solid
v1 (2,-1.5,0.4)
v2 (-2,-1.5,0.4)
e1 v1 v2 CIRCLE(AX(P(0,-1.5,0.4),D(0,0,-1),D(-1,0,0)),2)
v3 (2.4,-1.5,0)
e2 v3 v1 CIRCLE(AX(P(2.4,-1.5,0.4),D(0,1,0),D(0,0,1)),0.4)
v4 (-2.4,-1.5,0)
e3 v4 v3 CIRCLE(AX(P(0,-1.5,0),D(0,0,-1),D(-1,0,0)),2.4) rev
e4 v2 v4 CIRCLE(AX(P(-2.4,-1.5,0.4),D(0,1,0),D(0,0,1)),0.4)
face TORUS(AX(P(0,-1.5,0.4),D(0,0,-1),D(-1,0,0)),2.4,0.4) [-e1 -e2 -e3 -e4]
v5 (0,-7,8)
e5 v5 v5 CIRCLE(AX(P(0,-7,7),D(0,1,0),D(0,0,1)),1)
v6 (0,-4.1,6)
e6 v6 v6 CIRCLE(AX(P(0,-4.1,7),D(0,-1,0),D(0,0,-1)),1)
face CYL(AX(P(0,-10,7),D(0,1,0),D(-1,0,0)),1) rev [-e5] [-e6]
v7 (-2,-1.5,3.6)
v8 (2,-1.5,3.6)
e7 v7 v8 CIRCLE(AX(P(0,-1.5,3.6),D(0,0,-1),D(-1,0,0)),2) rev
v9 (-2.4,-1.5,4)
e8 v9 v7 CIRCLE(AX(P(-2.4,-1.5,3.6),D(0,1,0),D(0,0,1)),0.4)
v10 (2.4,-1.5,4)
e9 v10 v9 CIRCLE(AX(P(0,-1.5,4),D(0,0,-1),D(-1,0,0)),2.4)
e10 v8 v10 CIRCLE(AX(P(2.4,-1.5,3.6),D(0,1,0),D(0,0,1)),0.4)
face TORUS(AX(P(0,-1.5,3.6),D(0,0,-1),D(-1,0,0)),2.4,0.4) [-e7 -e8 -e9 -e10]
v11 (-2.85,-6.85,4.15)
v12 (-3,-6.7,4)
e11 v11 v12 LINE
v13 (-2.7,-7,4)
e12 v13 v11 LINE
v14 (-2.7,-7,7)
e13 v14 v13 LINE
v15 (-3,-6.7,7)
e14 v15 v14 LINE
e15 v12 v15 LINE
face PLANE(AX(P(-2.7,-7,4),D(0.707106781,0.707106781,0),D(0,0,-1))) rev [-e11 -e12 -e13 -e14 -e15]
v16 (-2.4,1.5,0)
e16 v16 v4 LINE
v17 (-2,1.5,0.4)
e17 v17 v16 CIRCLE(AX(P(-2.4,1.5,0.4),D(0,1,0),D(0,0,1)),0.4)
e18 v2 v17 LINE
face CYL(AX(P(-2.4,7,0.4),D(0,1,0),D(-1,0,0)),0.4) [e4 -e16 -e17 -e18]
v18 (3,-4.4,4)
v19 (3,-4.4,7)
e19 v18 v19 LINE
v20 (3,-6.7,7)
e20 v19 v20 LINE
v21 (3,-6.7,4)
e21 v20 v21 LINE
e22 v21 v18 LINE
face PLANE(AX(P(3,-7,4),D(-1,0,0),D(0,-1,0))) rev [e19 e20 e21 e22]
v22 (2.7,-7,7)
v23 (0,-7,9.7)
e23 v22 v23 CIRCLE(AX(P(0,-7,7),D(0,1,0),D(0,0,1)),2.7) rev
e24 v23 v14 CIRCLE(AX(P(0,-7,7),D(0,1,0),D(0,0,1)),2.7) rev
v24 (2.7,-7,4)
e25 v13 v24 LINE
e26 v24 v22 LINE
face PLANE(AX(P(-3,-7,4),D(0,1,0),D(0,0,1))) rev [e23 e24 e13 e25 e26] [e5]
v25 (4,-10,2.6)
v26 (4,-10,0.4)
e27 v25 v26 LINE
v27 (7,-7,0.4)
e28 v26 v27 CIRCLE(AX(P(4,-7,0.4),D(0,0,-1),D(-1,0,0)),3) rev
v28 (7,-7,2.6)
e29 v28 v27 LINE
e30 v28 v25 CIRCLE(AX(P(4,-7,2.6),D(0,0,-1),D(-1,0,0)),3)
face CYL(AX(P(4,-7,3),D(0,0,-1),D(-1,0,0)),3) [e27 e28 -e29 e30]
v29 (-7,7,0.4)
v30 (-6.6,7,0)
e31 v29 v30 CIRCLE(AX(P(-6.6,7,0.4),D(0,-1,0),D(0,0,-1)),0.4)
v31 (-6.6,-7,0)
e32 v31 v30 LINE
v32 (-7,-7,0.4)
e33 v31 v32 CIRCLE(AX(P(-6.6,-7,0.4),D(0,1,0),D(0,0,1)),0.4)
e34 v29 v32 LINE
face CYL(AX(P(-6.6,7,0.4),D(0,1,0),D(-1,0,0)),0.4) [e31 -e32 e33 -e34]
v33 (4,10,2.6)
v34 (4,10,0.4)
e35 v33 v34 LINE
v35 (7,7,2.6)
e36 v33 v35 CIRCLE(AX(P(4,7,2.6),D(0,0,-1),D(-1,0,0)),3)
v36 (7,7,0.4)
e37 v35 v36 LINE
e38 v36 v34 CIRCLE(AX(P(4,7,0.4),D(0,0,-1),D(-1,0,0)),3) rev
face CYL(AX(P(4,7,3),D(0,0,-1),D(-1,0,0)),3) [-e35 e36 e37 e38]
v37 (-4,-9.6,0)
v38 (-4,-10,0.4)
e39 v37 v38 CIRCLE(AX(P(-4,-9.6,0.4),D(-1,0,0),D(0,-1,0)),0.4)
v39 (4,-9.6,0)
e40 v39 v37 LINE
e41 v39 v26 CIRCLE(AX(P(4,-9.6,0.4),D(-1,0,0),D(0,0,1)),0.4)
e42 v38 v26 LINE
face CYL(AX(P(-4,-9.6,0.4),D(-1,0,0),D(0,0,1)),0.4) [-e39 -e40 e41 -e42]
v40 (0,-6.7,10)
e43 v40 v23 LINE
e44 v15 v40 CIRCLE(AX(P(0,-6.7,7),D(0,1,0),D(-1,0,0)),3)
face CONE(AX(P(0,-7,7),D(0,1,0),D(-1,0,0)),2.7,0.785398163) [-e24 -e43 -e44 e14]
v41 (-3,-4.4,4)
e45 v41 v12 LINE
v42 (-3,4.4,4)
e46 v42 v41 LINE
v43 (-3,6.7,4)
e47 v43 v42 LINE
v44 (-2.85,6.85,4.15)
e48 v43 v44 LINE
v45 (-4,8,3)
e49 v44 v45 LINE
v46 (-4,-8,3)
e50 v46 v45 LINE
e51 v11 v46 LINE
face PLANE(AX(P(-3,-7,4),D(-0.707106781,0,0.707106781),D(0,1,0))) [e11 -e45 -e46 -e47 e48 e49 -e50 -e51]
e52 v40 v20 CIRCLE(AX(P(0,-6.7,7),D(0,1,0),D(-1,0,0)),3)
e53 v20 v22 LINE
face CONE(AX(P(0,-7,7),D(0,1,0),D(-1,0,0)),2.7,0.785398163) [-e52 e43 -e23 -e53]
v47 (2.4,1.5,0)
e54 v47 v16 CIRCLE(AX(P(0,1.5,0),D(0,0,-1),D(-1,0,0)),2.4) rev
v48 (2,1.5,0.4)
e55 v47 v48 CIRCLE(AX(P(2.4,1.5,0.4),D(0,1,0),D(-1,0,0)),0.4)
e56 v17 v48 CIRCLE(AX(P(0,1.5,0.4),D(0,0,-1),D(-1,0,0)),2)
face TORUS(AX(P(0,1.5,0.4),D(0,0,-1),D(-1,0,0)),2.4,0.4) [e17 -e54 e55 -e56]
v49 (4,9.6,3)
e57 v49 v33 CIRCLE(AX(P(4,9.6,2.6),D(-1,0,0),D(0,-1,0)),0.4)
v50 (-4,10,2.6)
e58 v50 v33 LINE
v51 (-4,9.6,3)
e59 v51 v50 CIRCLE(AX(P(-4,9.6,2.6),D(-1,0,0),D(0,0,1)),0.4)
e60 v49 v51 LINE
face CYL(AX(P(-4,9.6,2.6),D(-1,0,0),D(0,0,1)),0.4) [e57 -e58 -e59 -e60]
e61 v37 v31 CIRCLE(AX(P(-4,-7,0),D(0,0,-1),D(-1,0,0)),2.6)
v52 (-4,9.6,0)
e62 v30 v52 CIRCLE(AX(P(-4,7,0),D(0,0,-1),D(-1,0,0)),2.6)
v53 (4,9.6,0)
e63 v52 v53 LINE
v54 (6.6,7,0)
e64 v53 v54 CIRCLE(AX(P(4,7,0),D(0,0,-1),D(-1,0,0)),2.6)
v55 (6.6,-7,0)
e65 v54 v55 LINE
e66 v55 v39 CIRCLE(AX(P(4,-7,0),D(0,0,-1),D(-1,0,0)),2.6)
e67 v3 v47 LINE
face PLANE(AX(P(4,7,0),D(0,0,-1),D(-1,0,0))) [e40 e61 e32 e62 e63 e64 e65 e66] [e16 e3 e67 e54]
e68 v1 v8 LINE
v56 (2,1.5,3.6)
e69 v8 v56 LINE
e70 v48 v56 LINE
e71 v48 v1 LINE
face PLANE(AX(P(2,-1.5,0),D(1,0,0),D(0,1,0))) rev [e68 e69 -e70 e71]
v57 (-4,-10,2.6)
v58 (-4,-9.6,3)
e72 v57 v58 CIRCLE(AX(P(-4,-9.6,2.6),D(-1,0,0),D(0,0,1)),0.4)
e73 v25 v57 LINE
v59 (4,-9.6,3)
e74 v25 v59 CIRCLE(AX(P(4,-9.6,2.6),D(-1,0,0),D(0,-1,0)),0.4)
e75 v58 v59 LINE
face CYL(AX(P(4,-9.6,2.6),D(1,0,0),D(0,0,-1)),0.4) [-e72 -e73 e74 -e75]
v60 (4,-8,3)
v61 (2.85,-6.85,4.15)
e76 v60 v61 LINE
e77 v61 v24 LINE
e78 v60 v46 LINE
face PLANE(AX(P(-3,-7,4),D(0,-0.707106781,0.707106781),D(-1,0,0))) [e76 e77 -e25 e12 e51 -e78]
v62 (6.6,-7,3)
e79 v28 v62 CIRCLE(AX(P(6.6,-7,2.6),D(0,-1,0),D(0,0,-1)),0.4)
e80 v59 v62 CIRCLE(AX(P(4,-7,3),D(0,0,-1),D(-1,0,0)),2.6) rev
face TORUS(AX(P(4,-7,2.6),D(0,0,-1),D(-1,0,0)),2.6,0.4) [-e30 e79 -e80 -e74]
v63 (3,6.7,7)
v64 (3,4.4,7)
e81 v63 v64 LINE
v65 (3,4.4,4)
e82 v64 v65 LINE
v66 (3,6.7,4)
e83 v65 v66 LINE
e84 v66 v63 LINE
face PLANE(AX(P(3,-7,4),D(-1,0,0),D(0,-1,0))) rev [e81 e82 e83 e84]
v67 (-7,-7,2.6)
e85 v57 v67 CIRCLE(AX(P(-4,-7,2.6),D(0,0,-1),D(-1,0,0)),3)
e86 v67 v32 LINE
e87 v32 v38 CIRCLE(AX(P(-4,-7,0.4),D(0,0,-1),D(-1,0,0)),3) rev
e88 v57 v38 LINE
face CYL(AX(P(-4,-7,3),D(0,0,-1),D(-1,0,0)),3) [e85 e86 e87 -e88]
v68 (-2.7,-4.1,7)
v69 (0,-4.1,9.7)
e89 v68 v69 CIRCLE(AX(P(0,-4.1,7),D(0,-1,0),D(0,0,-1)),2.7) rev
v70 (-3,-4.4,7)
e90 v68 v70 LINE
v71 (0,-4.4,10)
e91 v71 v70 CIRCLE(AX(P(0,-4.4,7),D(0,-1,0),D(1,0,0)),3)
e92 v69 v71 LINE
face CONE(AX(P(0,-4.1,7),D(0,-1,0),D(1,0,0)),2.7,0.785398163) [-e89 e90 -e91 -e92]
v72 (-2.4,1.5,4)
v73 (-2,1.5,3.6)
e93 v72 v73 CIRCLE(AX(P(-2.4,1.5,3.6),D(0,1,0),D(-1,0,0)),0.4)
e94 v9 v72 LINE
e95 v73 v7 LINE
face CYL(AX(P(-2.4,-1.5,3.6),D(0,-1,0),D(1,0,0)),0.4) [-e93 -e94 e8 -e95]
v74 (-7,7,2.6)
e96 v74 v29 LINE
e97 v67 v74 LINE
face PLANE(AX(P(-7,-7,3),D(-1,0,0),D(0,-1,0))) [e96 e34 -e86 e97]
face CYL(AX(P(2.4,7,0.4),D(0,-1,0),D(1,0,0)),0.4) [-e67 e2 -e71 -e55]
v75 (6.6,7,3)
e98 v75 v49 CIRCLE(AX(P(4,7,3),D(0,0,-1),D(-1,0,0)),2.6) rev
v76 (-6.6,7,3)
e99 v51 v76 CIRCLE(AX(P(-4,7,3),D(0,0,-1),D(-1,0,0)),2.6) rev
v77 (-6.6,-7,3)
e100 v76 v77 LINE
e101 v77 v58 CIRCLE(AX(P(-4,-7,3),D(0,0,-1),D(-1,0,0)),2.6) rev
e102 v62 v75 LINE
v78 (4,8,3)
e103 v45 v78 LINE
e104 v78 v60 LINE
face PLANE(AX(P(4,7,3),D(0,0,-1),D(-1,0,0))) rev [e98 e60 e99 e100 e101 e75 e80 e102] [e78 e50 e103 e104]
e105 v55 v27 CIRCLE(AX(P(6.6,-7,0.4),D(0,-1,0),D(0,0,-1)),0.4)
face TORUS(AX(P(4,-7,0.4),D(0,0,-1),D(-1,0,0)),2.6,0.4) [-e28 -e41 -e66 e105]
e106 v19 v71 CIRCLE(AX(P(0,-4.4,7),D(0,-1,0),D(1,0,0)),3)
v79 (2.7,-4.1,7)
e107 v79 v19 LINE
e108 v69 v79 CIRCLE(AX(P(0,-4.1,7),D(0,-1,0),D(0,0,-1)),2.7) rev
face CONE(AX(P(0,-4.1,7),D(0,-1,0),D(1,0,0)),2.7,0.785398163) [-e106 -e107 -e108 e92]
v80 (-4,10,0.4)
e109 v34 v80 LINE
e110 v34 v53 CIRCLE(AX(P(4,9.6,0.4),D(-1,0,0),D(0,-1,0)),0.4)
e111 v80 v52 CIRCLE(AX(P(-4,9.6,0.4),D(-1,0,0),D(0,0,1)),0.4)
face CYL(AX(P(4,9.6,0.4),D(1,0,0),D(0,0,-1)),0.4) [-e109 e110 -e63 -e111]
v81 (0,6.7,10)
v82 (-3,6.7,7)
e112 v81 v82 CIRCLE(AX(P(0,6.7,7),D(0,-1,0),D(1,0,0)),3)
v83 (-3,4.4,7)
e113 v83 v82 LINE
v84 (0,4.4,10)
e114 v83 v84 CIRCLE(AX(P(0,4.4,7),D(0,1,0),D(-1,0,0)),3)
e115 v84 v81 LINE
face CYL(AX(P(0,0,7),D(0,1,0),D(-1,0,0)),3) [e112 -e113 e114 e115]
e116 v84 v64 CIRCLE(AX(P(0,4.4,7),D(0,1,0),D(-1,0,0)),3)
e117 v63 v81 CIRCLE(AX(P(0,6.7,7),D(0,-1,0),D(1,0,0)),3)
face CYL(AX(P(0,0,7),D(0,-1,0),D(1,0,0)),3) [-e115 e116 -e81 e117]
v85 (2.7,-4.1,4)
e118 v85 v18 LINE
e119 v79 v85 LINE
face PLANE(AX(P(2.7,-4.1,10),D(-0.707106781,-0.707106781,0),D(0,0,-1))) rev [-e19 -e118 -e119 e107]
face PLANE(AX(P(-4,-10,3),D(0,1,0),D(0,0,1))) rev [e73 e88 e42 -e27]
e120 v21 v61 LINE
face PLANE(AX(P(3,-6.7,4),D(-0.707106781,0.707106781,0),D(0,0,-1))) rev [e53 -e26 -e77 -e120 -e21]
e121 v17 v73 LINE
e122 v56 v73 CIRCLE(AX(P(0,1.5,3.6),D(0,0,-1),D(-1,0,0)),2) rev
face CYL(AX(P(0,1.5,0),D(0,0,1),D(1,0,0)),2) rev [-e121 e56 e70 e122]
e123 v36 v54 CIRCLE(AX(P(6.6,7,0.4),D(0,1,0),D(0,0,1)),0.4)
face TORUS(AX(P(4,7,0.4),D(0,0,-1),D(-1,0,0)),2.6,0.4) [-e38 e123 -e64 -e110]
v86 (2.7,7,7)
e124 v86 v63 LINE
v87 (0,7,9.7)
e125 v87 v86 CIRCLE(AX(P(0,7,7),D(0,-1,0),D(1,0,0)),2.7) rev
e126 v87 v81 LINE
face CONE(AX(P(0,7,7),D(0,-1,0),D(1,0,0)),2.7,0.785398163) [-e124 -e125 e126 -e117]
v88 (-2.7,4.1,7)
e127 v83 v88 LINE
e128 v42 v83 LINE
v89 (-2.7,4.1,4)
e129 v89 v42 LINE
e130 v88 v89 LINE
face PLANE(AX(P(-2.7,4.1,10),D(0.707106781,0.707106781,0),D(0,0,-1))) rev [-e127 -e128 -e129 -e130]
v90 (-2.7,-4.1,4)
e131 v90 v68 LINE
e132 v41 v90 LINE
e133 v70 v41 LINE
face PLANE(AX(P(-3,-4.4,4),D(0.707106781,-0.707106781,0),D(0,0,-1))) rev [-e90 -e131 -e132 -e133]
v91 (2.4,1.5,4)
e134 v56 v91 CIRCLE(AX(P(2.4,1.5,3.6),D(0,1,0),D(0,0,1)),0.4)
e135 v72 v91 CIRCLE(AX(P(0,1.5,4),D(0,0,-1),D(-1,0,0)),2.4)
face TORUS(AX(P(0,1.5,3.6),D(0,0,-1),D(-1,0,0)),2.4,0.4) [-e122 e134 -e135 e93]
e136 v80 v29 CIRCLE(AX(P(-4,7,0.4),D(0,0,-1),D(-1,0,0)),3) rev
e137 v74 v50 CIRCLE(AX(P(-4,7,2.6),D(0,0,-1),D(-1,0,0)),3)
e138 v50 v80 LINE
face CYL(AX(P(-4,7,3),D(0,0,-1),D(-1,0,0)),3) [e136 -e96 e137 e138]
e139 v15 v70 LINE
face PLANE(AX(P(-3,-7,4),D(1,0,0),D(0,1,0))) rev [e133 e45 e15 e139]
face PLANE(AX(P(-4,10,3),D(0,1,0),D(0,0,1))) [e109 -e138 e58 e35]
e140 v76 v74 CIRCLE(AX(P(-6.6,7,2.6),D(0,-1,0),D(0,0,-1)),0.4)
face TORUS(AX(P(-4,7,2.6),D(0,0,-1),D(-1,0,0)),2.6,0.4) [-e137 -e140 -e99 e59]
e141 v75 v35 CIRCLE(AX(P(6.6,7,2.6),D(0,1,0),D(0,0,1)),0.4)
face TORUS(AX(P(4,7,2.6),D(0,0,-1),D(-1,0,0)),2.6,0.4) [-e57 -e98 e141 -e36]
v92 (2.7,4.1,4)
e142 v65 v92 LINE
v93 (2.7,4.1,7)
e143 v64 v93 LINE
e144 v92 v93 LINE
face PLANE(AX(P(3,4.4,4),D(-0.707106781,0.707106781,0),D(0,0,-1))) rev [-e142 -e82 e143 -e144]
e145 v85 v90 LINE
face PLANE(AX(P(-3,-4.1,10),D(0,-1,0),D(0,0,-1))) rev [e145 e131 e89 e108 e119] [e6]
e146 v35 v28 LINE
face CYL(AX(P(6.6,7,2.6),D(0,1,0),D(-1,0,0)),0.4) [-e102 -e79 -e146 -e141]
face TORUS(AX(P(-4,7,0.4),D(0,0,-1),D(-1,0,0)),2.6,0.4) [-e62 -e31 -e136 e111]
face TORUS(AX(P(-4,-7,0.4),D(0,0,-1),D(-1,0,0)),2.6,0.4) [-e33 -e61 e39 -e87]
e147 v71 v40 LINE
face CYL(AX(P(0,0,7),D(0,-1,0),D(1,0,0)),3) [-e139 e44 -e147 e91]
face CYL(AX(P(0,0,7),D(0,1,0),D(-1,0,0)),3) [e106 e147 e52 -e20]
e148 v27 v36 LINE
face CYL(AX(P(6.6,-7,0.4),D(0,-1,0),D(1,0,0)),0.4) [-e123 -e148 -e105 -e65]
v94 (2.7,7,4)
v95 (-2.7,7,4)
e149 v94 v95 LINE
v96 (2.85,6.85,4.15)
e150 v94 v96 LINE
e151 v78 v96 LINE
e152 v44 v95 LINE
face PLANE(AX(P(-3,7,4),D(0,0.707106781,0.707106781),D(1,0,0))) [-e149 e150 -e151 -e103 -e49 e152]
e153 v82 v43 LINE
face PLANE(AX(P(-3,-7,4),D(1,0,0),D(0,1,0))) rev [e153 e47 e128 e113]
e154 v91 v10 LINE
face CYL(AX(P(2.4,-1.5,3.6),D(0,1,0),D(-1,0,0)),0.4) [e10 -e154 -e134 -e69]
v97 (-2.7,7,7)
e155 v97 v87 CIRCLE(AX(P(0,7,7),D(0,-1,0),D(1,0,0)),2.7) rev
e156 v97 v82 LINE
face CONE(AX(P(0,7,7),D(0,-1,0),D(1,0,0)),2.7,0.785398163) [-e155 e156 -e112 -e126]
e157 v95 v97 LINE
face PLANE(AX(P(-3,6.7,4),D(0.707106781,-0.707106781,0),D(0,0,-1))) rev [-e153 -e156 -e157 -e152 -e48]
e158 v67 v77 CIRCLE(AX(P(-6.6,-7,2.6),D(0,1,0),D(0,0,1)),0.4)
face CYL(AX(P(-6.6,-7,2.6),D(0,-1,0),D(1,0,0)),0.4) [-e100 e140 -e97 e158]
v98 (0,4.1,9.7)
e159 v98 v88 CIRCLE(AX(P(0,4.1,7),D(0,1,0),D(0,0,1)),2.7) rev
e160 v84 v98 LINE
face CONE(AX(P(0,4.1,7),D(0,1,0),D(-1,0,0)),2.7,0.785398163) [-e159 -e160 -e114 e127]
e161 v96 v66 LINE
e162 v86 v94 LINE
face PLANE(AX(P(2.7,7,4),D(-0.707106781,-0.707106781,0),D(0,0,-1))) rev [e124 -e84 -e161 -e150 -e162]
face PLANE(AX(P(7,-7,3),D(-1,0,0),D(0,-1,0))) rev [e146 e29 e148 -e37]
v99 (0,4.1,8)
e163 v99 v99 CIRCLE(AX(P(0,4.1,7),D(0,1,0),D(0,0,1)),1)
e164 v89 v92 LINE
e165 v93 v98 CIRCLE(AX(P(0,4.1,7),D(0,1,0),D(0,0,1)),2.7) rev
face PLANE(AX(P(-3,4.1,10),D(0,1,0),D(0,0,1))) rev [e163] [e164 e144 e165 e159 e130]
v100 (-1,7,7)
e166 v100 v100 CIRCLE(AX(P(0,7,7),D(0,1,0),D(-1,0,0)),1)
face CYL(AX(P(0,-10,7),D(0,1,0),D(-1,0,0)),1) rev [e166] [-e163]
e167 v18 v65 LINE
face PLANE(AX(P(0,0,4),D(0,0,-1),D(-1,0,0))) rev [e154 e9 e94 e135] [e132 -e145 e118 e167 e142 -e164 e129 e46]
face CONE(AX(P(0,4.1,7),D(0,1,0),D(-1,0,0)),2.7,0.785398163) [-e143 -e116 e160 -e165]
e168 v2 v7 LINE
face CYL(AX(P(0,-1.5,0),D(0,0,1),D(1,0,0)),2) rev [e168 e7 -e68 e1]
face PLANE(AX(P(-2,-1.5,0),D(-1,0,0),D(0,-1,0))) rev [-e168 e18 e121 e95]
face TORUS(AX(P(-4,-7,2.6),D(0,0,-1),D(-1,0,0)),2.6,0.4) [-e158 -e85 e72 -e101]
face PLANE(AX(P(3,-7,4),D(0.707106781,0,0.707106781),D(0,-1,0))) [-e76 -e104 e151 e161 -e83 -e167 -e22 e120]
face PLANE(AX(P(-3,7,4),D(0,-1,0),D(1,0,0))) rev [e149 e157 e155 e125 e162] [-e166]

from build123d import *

# Parameters (mm, degrees)
BOSS_EXTRUDE1_DEPTH = 3
SKETCH2_W           = 6
SKETCH2_H           = 14
BOSS_EXTRUDE2_DEPTH = 1
SKETCH3_W           = 6
SKETCH3_H           = 2.9
BOSS_EXTRUDE3_DEPTH = 6
SKETCH4_R           = 1
CUT_EXTRUDE1_DEPTH  = 21.928449536
FILLET1_R           = 3
CHAMFER1_SIZE       = 1
CHAMFER2_SIZE       = 0.3
CUT_EXTRUDE2_DEPTH  = 14.601470509
FILLET2_R           = 0.4


with BuildPart() as part:
    # Sketch1 → Boss-Extrude1 (new body)
    with BuildSketch(Plane.XY):
        with BuildLine():
            Line((-4, -10), (4, -10))
            ThreePointArc((4, -10), (6.121320344, -9.121320344), (7, -7))
            Line((7, -7), (7, 7))
            ThreePointArc((7, 7), (6.121320344, 9.121320344), (4, 10))
            Line((4, 10), (-4, 10))
            ThreePointArc((-4, 10), (-6.121320344, 9.121320344), (-7, 7))
            Line((-7, 7), (-7, -7))
            ThreePointArc((-7, -7), (-6.121320344, -9.121320344), (-4, -10))
        make_face()
    extrude(amount=BOSS_EXTRUDE1_DEPTH)

    # Sketch2 → Boss-Extrude2 (add)
    with BuildSketch(Plane.XY.offset(3)):
        Rectangle(SKETCH2_W, SKETCH2_H)
    extrude(amount=BOSS_EXTRUDE2_DEPTH)

    # Sketch3 → Boss-Extrude3 (add)
    with BuildSketch(Plane.XY.offset(4)):
        with Locations((0, 5.55)):
            Rectangle(SKETCH3_W, SKETCH3_H)
        with Locations((0, -5.55)):
            Rectangle(SKETCH3_W, SKETCH3_H)
    extrude(amount=BOSS_EXTRUDE3_DEPTH)

    # Sketch4 → Cut-Extrude1 (cut, through all)
    with BuildSketch(Plane(origin=(0, 7, 0), x_dir=(1, 0, 0), z_dir=(0, 1, 0))):
        with Locations(Location((0, -7, 0), (0, 0, 90))):
            Circle(SKETCH4_R)
    extrude(amount=-CUT_EXTRUDE1_DEPTH, mode=Mode.SUBTRACT)

    # Fillet1
    fillet1_edges = [part.edges().sort_by_distance(p)[0] for p in [
        (3, -5.55, 10),
        (-3, -5.55, 10),
        (-3, 5.55, 10),
        (3, 5.55, 10),
    ]]
    fillet(fillet1_edges, radius=FILLET1_R - 0.0001)  # a hair under: the kernel refuses the full size

    # Chamfer1
    chamfer1_edges = [part.edges().sort_by_distance(p)[0] for p in [
        (3, 0, 3),
        (0, 7, 3),
        (-3, 0, 3),
        (0, -7, 3),
    ]]
    chamfer(chamfer1_edges, length=CHAMFER1_SIZE - 0.0001)  # a hair under: the kernel refuses the full size

    # Chamfer2
    chamfer2_edges = [part.edges().sort_by_distance(p)[0] for p in [
        (-3, -4.1, 5.50005),
        (3, -4.1, 5.50005),
        (-2.121349633, -4.1, 9.121349633),
        (2.121349633, -4.1, 9.121349633),
        (3, 7, 5.5),
        (3, 4.1, 5.50005),
        (3, -7, 5.5),
        (-3, -7, 5.5),
        (-2.121349633, -7, 9.121349633),
        (2.121349633, -7, 9.121349633),
        (-3, 4.1, 5.50005),
        (-3, 7, 5.5),
        (2.121349633, 4.1, 9.121349633),
        (-2.121349633, 4.1, 9.121349633),
        (2.121349633, 7, 9.121349633),
        (-2.121349633, 7, 9.121349633),
    ]]
    chamfer(chamfer2_edges, length=CHAMFER2_SIZE)

    # Sketch5 → Cut-Extrude2 (cut, through all)
    with BuildSketch(Plane.XY.offset(4)):
        with BuildLine():
            Line((-2, -1.5), (-2, 1.5))
            ThreePointArc((-2, 1.5), (0, 3.5), (2, 1.5))
            Line((2, 1.5), (2, -1.5))
            ThreePointArc((2, -1.5), (0, -3.5), (-2, -1.5))
        make_face()
    extrude(amount=-CUT_EXTRUDE2_DEPTH, mode=Mode.SUBTRACT)

    # Fillet2
    fillet2_edges = [part.edges().sort_by_distance(p)[0] for p in [
        (6.121320344, -9.121320344, 0),
        (7, 0, 0),
        (6.121320344, 9.121320344, 0),
        (0, 10, 0),
        (7, 0, 3),
        (6.121320344, -9.121320344, 3),
        (0, -3.5, 0),
        (-2, 0, 0),
        (0, 3.5, 0),
        (2, 0, 0),
        (0, -3.5, 4),
        (2, 0, 4),
        (0, 3.5, 4),
        (-2, 0, 4),
        (0, -10, 3),
        (-6.121320344, -9.121320344, 3),
        (-7, 0, 3),
        (-6.121320344, 9.121320344, 3),
        (0, 10, 3),
        (-6.121320344, 9.121320344, 0),
        (6.121320344, 9.121320344, 3),
        (-7, 0, 0),
        (-6.121320344, -9.121320344, 0),
        (0, -10, 0),
    ]]
    fillet(fillet2_edges, radius=FILLET2_R)


solid = part.part
